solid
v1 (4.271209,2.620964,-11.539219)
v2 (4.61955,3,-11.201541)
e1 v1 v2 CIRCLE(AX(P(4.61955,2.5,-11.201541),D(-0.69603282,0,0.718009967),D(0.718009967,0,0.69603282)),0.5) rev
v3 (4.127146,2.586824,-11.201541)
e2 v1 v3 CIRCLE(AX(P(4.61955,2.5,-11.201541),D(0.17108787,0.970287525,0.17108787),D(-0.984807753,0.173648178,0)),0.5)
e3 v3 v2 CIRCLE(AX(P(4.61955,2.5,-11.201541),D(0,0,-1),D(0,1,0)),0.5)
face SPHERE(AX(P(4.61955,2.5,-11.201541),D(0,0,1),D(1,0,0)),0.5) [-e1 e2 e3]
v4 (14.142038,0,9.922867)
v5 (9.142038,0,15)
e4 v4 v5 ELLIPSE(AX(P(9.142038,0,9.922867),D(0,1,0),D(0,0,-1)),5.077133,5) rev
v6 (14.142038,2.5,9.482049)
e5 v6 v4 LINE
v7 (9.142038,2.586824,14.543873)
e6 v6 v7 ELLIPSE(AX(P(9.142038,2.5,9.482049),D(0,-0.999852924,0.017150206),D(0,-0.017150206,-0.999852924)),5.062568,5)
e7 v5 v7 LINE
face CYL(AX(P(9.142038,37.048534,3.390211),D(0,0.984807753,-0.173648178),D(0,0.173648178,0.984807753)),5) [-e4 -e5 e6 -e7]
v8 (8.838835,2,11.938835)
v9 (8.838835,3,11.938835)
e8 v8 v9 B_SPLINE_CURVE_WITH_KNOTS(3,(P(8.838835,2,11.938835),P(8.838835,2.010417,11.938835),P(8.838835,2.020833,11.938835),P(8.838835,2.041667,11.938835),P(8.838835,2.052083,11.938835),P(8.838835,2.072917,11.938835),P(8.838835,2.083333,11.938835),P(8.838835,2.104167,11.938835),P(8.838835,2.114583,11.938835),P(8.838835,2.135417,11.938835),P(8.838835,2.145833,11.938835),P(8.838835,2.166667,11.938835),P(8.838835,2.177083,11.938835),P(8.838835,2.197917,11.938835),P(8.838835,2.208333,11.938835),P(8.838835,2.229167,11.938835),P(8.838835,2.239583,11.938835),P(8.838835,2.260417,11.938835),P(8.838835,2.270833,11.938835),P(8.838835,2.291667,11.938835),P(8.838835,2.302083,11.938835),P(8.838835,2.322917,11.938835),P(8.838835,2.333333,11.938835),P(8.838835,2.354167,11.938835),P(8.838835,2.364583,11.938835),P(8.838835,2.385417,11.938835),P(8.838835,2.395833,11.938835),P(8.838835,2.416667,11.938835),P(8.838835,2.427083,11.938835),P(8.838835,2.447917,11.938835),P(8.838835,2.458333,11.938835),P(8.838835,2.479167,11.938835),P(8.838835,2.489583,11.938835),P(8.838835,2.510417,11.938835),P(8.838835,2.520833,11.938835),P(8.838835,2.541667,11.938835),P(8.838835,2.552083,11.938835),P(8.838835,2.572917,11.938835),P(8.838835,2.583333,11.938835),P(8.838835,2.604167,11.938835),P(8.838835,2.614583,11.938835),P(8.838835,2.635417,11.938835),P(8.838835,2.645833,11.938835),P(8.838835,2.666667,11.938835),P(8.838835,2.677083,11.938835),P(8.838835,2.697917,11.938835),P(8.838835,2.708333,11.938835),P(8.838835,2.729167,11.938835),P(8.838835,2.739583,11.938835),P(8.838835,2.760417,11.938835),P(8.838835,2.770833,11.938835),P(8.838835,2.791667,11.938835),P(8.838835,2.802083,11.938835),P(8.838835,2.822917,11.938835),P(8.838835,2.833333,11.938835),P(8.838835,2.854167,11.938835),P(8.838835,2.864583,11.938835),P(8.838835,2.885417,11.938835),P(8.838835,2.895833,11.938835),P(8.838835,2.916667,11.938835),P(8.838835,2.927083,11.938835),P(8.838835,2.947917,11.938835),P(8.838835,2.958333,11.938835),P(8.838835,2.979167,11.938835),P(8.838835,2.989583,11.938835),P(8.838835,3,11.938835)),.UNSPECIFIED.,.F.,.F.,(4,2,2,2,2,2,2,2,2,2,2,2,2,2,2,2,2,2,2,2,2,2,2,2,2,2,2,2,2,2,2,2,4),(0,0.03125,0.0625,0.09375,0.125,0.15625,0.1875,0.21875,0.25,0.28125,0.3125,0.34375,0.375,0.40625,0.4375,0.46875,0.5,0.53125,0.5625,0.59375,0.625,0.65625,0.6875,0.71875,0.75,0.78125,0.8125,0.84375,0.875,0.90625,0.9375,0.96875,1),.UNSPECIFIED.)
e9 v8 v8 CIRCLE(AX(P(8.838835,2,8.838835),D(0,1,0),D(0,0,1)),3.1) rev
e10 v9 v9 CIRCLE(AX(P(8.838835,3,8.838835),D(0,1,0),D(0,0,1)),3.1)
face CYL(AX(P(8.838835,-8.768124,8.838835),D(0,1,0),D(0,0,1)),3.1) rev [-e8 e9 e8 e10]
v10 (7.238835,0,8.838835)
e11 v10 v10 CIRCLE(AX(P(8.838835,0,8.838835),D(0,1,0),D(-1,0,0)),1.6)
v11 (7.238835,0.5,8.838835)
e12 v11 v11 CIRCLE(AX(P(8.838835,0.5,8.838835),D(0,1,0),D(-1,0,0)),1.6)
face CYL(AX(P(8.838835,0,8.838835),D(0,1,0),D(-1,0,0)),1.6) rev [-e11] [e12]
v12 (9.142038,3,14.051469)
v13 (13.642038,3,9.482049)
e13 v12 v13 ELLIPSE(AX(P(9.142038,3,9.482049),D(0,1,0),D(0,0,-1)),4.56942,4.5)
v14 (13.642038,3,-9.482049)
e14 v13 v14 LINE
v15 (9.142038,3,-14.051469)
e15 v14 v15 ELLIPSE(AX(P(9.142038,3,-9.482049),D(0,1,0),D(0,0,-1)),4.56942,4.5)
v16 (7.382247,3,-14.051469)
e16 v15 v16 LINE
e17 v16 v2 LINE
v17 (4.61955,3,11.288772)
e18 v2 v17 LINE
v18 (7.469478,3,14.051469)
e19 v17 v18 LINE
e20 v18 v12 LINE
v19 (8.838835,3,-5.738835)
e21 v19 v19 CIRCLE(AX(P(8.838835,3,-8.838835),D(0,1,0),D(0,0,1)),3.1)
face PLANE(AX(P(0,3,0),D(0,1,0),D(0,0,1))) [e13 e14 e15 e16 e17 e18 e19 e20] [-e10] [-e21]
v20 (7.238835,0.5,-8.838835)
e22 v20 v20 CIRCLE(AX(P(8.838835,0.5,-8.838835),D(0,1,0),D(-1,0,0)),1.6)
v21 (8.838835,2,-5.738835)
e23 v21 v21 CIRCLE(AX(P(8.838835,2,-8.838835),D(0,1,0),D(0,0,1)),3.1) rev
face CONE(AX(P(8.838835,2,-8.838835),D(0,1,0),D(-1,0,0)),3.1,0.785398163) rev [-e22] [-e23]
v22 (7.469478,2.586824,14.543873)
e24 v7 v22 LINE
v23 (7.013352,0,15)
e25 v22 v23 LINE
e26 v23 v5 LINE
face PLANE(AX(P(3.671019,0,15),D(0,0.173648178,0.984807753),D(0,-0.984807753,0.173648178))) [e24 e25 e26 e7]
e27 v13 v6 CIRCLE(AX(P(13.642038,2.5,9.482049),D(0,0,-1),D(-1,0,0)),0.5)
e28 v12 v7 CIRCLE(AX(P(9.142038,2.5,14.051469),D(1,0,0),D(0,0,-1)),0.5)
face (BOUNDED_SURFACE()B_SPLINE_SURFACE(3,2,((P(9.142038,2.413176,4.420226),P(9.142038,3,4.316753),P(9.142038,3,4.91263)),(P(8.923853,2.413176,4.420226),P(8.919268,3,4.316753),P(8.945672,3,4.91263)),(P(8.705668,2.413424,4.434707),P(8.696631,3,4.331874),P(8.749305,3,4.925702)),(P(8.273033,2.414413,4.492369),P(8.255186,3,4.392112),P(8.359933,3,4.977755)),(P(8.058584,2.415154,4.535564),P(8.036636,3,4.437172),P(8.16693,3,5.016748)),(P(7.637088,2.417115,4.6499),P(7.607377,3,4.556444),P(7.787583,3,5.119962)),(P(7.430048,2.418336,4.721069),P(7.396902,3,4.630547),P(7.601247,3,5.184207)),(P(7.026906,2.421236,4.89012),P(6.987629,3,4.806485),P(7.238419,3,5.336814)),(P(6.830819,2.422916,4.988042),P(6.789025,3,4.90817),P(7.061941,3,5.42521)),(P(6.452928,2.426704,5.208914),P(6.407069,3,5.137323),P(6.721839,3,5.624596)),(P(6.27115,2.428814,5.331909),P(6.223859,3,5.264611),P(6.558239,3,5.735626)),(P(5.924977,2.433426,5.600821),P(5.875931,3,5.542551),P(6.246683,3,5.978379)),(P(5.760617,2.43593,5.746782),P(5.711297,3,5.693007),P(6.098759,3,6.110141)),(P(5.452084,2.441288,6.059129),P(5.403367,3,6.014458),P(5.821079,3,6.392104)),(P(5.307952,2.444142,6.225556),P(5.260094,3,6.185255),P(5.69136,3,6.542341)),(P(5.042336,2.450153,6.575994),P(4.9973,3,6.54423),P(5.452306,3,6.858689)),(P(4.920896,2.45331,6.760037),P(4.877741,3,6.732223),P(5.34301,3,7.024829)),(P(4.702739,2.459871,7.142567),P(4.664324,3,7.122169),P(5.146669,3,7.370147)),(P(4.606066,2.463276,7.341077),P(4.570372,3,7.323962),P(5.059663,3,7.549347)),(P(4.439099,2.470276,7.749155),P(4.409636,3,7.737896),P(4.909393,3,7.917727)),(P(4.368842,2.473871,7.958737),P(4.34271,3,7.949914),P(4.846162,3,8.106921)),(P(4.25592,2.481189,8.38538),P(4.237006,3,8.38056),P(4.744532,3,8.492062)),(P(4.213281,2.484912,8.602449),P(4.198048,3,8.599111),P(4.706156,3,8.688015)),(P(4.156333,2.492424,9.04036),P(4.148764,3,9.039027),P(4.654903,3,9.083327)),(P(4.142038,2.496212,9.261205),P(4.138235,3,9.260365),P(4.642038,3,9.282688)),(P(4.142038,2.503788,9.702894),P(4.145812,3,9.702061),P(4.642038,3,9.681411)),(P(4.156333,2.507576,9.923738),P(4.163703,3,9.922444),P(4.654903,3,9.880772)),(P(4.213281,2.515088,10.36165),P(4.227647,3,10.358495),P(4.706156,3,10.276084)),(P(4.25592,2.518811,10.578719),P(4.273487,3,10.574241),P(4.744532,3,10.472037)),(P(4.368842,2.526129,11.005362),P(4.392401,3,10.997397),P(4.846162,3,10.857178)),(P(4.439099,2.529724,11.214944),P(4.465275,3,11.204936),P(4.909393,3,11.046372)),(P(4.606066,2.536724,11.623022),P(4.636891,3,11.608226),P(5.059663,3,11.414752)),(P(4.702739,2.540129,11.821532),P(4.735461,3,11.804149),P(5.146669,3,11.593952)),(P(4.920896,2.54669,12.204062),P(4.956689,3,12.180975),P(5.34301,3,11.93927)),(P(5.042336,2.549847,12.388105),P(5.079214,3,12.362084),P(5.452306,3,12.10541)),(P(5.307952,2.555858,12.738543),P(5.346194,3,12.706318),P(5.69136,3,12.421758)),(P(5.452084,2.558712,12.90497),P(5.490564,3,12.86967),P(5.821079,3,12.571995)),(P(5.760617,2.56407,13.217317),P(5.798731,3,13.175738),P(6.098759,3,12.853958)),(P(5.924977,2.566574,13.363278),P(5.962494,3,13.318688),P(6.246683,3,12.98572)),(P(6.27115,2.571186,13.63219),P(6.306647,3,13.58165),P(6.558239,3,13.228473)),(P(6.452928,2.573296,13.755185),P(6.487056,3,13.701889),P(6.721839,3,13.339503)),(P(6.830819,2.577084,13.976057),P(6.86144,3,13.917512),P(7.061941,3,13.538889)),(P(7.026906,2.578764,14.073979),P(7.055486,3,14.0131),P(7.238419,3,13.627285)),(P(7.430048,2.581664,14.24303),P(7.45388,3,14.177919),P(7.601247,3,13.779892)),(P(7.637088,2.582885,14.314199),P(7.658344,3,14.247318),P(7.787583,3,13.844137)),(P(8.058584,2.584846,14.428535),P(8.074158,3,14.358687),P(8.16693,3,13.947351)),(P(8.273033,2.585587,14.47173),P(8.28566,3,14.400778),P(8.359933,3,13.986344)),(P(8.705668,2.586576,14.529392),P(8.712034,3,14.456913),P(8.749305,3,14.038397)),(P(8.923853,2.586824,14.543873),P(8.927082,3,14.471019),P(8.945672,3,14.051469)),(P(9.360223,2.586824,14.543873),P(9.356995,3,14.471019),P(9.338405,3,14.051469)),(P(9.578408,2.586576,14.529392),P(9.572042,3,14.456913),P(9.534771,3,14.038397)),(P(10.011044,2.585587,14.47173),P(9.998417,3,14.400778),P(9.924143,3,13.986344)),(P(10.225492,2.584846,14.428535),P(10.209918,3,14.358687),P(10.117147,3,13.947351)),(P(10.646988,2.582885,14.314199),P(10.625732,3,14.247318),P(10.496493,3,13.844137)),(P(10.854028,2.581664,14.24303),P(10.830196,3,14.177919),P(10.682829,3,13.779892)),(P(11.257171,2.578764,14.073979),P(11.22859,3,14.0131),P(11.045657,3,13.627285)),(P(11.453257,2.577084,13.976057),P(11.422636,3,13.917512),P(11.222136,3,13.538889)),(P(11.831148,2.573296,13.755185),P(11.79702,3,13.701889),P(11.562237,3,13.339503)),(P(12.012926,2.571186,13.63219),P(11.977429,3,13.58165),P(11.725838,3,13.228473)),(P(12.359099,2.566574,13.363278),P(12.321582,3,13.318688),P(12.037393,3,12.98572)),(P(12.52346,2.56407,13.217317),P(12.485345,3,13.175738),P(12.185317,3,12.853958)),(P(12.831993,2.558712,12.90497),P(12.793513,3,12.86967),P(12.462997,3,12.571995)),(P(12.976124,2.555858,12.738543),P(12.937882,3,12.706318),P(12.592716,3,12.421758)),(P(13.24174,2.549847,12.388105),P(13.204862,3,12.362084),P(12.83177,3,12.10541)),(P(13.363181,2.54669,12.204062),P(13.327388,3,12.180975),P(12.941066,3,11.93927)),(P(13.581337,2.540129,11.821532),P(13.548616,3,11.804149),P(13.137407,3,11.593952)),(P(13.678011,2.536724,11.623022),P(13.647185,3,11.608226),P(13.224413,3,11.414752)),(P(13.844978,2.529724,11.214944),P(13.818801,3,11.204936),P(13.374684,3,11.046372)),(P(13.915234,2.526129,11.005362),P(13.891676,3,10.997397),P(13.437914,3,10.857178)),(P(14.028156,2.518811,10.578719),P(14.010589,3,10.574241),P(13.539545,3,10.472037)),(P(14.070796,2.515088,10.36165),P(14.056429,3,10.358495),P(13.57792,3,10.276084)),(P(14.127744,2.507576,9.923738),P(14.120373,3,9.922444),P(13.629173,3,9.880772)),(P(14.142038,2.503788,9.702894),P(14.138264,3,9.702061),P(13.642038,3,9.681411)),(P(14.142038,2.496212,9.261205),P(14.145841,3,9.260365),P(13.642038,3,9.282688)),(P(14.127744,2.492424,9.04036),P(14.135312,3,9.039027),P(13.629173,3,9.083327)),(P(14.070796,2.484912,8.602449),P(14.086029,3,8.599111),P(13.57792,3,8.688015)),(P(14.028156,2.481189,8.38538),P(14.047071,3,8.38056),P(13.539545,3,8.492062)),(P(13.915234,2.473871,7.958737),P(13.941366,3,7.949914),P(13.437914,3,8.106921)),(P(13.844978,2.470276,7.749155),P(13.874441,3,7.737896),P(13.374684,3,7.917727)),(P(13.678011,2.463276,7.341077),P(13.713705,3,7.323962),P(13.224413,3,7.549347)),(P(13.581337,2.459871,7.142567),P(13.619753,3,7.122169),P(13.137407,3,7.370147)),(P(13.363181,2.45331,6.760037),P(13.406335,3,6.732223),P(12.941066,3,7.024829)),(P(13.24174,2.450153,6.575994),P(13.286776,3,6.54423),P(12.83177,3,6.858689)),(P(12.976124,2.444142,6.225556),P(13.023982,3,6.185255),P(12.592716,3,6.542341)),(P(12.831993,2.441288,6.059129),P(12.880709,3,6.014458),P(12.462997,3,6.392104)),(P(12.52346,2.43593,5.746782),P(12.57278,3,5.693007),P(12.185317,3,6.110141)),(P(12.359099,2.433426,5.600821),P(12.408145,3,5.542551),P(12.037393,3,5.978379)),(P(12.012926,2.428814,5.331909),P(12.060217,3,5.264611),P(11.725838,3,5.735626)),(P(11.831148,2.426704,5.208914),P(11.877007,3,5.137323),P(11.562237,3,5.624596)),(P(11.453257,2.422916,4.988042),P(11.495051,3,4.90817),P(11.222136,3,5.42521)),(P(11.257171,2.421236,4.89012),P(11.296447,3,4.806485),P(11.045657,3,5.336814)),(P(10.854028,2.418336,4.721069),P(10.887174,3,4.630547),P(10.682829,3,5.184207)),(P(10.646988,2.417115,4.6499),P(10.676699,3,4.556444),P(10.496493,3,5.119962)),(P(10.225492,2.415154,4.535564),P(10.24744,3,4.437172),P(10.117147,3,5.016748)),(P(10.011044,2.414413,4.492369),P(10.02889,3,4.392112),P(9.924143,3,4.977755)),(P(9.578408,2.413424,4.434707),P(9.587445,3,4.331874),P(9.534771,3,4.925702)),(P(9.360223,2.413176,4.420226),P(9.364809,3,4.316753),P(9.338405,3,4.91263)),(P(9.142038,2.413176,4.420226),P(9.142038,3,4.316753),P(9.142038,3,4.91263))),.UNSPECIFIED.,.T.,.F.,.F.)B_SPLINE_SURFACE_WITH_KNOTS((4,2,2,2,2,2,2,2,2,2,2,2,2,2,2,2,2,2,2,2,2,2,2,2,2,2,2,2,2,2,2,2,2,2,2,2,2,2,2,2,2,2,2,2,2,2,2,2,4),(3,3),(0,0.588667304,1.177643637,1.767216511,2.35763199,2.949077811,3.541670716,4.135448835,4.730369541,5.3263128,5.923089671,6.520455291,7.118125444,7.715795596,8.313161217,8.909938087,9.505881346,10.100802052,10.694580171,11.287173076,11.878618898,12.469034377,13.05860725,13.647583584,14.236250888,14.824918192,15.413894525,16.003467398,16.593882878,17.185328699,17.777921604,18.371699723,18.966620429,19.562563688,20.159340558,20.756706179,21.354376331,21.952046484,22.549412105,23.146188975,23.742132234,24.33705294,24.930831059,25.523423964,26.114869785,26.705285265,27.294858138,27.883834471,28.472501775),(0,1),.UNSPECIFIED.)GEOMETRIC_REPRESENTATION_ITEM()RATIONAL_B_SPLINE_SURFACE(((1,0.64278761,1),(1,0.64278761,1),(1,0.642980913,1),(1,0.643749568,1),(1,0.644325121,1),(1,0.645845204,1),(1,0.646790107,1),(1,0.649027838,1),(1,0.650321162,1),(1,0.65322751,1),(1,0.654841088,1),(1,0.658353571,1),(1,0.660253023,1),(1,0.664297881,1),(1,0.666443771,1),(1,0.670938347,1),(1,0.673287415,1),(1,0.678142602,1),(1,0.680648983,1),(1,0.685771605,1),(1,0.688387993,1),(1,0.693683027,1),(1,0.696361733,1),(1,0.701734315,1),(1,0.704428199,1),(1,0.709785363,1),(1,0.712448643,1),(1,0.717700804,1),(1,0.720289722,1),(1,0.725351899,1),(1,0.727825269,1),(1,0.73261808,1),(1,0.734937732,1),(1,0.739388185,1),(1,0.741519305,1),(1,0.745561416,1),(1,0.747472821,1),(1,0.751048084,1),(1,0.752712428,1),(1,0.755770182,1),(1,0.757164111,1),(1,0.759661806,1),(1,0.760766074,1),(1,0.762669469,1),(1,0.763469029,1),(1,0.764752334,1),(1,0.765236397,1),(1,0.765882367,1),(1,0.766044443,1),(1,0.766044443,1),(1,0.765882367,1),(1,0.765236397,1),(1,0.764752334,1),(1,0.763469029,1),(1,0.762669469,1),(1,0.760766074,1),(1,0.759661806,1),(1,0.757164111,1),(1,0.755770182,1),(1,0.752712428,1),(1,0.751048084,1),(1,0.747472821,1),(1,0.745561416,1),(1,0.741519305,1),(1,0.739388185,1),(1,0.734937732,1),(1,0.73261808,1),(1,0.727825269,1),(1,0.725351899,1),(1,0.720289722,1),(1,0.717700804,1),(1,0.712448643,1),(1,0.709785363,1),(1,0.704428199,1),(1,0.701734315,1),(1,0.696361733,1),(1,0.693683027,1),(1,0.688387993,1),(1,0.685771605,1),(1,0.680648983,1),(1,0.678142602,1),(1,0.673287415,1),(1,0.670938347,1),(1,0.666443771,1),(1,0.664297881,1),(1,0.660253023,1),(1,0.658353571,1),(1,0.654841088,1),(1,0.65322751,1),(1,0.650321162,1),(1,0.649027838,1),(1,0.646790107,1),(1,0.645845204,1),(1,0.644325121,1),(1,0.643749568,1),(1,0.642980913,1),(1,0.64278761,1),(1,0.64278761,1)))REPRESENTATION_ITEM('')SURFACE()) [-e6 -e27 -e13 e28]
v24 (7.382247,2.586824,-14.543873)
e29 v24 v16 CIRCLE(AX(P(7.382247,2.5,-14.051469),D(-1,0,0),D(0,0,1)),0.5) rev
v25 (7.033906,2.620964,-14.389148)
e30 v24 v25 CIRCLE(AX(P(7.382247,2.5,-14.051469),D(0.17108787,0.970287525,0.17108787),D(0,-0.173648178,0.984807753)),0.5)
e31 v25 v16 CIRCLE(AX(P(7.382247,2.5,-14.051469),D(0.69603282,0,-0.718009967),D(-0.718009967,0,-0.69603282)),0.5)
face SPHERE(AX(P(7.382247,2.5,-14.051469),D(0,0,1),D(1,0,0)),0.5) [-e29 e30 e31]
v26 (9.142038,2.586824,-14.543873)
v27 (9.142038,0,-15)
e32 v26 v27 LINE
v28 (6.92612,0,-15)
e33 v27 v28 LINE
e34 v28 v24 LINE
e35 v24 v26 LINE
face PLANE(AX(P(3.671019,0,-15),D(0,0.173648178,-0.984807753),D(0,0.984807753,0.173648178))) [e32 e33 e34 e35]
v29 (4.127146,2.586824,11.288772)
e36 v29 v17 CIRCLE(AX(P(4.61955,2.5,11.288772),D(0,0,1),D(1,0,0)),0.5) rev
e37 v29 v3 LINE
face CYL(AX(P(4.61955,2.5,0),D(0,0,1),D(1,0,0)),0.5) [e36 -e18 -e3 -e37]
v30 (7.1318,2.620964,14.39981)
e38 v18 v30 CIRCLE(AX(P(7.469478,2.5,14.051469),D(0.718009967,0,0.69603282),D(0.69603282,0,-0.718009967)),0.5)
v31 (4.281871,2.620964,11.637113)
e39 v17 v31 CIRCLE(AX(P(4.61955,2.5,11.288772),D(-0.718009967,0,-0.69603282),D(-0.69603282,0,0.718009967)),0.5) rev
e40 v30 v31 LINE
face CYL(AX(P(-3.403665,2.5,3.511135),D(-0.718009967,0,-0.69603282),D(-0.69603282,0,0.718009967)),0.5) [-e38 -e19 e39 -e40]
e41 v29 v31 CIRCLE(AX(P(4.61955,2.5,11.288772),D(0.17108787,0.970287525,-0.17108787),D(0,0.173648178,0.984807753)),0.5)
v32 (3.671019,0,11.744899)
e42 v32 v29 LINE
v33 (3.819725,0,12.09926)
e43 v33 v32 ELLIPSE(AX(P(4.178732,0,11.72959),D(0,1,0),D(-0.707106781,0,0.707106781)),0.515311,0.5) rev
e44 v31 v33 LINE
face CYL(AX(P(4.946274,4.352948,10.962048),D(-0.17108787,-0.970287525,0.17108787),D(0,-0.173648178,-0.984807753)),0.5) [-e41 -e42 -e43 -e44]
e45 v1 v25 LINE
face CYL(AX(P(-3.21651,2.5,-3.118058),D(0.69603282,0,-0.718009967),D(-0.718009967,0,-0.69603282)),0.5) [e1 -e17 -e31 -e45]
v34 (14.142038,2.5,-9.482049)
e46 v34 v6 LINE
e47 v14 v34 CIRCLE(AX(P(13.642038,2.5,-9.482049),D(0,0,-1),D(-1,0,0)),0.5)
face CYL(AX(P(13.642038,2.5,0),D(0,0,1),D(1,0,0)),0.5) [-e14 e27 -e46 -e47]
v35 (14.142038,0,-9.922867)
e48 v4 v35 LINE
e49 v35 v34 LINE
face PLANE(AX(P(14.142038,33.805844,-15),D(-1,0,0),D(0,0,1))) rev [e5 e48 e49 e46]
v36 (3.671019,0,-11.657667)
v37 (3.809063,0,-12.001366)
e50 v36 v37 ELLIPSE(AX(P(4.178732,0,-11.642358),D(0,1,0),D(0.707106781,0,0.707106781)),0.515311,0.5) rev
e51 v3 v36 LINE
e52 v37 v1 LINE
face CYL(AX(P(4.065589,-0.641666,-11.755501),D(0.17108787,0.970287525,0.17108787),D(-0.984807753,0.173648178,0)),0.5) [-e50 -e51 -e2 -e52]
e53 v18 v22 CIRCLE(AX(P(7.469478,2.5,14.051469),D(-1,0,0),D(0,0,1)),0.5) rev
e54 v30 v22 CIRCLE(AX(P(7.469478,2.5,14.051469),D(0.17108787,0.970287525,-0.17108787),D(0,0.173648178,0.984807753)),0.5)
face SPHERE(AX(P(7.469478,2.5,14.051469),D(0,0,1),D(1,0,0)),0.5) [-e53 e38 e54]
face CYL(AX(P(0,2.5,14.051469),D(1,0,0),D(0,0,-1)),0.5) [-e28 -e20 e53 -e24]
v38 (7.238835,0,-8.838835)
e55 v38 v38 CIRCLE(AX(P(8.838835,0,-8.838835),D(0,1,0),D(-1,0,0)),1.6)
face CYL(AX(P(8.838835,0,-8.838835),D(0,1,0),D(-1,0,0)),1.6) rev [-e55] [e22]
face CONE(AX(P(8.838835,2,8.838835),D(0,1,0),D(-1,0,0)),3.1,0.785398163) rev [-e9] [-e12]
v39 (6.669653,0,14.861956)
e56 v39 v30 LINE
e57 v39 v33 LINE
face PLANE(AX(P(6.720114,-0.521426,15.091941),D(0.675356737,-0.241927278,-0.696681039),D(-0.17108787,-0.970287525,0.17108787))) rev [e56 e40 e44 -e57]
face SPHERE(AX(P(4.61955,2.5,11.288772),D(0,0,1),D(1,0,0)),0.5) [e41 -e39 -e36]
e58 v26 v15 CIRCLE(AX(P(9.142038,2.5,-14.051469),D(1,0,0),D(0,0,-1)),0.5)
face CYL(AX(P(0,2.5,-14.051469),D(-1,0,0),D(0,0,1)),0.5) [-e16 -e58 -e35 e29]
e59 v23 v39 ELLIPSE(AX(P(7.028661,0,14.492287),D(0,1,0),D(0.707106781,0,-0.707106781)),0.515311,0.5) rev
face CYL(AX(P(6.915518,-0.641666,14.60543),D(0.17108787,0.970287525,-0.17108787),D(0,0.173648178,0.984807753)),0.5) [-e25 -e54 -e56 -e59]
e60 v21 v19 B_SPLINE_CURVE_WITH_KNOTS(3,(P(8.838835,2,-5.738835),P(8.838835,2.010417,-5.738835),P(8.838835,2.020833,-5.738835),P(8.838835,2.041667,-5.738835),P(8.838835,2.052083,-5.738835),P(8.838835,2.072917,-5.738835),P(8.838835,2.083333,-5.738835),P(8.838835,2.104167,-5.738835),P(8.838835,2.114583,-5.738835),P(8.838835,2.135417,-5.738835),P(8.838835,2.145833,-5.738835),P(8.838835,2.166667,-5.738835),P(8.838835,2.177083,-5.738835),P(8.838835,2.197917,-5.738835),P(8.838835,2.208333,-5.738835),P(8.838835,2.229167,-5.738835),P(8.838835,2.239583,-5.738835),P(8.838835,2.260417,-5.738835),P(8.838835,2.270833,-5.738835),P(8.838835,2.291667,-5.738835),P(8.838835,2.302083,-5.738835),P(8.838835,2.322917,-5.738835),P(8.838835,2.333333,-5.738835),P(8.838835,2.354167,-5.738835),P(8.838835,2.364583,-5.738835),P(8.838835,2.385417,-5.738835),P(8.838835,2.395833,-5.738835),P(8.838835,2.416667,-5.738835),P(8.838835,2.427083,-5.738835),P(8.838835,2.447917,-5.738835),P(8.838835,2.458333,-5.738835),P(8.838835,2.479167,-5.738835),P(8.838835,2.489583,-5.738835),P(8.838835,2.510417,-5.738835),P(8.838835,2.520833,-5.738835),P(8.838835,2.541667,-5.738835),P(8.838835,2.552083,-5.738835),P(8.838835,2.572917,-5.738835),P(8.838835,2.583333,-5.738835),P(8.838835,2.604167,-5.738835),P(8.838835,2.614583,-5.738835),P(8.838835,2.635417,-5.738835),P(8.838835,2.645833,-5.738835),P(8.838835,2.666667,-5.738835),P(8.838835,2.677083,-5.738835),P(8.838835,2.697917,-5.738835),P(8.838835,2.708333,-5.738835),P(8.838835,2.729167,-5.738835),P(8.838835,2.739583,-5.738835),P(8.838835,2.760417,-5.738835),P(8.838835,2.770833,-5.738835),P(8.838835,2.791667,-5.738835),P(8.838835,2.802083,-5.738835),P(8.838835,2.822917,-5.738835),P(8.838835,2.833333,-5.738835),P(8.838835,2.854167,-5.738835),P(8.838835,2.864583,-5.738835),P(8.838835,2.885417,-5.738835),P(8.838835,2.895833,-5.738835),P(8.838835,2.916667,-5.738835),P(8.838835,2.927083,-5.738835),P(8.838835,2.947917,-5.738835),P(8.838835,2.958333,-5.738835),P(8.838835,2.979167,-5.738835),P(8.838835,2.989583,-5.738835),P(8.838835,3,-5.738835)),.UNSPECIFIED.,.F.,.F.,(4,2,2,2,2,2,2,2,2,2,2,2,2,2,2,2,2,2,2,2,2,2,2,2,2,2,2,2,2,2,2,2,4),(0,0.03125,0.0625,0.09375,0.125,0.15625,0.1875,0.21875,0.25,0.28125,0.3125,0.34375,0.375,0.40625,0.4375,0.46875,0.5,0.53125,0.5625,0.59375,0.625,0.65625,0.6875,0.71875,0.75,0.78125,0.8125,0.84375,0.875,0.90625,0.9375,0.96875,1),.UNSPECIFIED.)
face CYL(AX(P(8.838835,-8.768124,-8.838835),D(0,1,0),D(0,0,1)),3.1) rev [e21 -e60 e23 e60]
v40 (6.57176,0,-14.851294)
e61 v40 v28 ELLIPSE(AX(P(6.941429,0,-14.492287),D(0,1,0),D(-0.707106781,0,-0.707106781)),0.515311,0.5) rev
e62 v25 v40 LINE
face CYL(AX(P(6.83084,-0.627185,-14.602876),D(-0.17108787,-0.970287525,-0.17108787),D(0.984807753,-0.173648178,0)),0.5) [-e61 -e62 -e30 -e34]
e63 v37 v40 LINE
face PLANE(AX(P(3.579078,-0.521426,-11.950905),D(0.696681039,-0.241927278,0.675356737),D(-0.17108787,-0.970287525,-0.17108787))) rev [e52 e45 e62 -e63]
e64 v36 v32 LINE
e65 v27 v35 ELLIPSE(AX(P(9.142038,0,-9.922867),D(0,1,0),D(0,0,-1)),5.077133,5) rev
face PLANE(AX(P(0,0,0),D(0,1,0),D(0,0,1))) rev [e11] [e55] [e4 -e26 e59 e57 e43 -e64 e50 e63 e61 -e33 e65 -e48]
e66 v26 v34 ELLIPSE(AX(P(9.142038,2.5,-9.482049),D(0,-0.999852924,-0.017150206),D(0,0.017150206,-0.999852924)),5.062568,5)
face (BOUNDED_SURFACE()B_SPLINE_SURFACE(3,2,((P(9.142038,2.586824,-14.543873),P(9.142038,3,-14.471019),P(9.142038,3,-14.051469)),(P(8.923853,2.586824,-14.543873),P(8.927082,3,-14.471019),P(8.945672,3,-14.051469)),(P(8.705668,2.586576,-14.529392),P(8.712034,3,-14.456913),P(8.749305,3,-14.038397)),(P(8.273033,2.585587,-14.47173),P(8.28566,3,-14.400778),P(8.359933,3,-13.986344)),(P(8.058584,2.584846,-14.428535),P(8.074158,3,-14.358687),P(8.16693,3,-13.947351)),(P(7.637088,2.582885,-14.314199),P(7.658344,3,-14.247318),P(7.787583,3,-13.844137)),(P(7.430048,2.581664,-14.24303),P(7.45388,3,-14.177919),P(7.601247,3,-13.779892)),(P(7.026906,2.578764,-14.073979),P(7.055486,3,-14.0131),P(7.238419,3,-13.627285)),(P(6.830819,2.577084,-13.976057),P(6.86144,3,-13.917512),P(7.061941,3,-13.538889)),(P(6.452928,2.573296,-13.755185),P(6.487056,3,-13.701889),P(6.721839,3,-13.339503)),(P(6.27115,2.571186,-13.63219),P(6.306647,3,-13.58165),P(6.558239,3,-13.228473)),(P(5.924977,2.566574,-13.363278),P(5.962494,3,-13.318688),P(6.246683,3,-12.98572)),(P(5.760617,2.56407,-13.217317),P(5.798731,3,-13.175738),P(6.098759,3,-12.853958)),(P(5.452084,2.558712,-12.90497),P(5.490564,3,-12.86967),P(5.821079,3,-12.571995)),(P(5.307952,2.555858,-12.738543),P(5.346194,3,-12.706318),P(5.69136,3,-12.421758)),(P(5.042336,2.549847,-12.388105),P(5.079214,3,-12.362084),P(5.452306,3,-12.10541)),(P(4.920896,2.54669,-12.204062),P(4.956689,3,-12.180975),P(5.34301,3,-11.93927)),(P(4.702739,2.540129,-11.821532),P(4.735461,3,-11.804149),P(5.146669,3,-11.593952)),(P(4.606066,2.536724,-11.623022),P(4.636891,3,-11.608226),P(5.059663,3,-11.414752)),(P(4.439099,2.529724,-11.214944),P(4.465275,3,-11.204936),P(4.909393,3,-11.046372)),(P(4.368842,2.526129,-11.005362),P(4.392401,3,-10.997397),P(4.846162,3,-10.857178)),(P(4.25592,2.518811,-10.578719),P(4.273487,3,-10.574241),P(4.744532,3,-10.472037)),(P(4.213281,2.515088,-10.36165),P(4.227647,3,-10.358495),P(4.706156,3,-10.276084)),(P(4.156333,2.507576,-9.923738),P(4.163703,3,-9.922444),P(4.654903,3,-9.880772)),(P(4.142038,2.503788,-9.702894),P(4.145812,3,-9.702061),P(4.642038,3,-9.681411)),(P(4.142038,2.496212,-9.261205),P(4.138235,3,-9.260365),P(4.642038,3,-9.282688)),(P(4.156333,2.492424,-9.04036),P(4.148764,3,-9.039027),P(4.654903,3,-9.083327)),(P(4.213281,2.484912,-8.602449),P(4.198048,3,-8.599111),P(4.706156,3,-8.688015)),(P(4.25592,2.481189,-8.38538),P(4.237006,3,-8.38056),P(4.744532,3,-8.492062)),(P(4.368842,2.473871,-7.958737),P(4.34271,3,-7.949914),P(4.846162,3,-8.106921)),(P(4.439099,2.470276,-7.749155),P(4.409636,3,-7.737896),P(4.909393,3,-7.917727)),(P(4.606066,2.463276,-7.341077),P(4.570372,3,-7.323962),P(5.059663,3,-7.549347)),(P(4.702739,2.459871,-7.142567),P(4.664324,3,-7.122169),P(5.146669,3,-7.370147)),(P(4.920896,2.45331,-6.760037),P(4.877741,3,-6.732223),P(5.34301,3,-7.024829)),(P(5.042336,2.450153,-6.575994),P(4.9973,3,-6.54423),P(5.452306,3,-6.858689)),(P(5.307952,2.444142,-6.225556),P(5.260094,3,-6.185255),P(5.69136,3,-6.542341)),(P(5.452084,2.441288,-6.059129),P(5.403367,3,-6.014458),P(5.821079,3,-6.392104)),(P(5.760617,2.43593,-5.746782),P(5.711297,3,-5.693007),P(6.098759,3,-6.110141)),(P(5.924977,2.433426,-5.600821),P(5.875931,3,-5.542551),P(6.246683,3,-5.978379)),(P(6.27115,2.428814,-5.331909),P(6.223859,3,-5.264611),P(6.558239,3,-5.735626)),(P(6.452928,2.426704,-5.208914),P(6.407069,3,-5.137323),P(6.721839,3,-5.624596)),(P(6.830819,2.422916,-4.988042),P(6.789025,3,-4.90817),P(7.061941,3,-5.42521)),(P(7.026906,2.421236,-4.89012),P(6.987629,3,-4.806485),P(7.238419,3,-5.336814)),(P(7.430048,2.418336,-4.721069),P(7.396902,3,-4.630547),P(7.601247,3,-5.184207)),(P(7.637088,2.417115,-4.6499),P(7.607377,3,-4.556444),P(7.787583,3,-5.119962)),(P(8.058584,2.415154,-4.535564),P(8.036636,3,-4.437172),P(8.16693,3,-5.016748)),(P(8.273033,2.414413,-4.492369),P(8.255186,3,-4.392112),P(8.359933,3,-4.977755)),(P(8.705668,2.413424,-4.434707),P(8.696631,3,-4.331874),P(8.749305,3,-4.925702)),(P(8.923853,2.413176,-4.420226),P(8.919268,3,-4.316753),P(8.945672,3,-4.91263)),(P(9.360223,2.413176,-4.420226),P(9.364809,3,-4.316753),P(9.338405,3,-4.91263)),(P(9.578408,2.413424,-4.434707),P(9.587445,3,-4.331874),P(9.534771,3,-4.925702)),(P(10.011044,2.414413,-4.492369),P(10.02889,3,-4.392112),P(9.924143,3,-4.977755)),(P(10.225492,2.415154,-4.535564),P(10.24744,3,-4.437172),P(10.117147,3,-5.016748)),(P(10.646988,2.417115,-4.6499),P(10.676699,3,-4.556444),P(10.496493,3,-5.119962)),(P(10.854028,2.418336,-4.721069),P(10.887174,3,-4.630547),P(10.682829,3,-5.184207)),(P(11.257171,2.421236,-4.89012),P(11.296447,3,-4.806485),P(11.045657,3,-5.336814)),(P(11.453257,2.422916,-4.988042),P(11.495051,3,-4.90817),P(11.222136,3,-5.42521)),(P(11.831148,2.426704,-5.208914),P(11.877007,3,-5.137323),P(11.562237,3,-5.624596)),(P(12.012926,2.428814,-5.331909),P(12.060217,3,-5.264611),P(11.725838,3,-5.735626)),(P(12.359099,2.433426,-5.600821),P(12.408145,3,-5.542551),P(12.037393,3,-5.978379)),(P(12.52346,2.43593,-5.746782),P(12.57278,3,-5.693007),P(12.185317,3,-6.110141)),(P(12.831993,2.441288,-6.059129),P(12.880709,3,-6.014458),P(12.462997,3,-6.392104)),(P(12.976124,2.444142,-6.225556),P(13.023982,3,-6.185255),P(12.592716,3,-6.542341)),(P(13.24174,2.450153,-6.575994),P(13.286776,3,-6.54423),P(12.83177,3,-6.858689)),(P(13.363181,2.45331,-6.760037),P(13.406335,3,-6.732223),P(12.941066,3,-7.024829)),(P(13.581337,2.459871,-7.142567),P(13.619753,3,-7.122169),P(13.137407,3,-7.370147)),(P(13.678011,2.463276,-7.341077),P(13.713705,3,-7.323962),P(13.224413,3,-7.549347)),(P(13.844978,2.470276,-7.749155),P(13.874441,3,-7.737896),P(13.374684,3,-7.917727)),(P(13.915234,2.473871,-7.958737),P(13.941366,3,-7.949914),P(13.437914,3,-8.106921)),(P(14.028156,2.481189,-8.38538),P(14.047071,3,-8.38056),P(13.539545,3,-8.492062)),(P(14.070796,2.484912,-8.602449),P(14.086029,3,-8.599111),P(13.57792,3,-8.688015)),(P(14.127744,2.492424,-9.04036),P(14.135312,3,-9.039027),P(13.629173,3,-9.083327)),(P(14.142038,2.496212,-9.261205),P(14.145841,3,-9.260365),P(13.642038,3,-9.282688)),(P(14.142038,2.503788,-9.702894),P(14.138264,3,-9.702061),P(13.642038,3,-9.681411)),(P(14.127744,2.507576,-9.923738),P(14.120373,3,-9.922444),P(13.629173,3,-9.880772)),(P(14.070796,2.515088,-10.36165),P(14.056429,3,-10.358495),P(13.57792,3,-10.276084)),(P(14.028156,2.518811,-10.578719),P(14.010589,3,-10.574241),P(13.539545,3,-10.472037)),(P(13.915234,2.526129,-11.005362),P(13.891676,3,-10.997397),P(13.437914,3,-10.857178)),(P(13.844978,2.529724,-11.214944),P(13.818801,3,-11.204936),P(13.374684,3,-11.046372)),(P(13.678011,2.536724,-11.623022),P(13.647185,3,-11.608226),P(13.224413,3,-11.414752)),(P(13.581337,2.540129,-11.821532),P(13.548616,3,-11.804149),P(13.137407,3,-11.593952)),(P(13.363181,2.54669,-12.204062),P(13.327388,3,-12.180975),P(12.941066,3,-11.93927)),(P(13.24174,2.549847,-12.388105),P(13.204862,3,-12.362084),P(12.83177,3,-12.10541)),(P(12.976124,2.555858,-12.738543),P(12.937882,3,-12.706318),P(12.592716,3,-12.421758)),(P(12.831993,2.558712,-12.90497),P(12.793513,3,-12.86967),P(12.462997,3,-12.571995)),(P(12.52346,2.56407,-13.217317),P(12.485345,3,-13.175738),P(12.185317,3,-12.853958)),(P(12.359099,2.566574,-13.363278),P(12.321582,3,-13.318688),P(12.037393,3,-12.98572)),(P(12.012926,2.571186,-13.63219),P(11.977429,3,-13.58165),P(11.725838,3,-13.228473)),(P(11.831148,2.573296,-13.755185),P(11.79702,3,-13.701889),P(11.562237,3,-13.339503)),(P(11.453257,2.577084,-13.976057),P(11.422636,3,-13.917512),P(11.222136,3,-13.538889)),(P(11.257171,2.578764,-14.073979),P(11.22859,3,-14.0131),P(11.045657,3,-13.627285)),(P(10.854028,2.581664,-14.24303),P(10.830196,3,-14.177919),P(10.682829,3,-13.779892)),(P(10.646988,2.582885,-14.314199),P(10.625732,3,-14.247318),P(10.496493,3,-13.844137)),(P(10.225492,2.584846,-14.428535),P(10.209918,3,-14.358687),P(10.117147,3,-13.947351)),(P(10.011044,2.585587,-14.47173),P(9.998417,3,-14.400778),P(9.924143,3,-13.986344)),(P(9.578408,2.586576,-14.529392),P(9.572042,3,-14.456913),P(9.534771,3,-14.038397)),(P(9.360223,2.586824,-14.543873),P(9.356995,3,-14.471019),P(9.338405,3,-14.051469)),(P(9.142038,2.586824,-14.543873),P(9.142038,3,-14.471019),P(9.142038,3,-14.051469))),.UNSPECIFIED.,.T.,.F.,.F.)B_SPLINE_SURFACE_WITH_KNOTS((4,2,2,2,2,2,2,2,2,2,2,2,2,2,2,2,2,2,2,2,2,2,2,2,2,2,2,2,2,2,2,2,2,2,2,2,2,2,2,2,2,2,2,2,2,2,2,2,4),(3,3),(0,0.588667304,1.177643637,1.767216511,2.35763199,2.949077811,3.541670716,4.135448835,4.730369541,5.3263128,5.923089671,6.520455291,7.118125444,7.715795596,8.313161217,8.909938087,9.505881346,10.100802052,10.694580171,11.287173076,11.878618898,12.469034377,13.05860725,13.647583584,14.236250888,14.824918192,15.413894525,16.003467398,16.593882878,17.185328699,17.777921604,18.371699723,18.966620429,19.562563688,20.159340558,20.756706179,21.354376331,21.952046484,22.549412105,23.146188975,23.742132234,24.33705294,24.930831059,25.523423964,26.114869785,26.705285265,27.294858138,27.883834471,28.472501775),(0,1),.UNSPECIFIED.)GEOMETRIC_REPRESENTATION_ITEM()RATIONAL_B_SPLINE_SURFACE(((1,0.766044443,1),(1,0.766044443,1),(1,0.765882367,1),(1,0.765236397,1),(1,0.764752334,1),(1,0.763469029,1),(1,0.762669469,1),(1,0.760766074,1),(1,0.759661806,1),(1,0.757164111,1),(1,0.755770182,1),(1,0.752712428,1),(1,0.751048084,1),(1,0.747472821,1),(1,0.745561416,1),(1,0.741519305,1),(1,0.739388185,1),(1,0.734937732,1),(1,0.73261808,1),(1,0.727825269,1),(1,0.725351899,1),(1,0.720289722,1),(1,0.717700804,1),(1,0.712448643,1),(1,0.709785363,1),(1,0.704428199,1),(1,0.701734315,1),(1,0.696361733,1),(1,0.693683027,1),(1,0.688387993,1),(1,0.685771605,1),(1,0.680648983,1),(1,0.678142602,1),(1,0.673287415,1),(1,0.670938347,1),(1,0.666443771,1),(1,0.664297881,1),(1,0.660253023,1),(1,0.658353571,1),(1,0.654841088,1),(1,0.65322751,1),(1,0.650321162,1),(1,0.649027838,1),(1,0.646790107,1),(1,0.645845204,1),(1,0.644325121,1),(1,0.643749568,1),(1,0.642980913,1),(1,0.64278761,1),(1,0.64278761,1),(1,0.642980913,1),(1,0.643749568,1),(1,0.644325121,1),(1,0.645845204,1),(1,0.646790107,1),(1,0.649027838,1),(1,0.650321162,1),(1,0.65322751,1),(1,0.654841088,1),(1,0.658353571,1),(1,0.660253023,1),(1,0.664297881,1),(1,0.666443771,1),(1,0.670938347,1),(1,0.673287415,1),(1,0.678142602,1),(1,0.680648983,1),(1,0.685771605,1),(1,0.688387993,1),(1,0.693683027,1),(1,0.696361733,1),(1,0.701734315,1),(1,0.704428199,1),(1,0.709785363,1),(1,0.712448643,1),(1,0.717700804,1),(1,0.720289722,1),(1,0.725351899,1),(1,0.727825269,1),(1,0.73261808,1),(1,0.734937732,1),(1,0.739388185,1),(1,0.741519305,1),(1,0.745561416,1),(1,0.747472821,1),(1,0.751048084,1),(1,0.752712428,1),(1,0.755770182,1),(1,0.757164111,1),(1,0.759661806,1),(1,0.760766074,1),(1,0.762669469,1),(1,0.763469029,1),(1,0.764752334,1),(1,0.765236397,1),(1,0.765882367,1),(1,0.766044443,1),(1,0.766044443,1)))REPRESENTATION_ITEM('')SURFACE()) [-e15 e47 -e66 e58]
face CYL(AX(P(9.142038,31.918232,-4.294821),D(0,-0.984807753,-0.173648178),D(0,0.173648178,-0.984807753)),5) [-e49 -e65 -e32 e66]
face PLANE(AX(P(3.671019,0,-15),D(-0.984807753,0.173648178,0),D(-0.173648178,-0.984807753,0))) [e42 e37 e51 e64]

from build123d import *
from OCP.BRepFilletAPI import BRepFilletAPI_MakeChamfer

# Parameters (mm, degrees)
EXTRUDE_1_DEPTH     = 3
EXTRUDE_1_TAPER     = 10.000000000000021
EXTRUDE_3_DEPTH     = 3
CUT_EXTRUDE_3_DEPTH = 17.82260394825962
SKETCH_6_R          = 1.6
CUT_EXTRUDE_2_DEPTH = 21.832600617678803
SKETCH_9_R          = 3.1000000000000005
CUT_EXTRUDE_4_DEPTH = 1
CHAMFER_1_SIZE      = 1.5
FILLET_2_R          = 5
CHAMFER_2_SIZE      = 3
CHAMFER_2_SIZE2     = 3.094724616911856
CHAMFER_2_SIZE2_2   = 3.0947246169118565
FILLET_1_R          = 0.5


with BuildPart() as part:
    # Эскиз1 → Бобышка-Вытянуть1 (new body)
    with BuildSketch(Plane(origin=(0, 0, 0), x_dir=(1, 0, 0), z_dir=(0, 1, 0))):
        Polygon((3.6710190578746005, 14.999999999999998), (3.6710190578746094, -15.000000000000004), (7.67101905787461, -15.000000000000002), (7.6710190578746005, 14.999999999999998), align=None)
    extrude(amount=EXTRUDE_1_DEPTH, taper=EXTRUDE_1_TAPER)


with BuildPart() as body_2:
    # Эскиз2 → Бобышка-Вытянуть3 (new body)
    with BuildSketch(Plane(origin=(0, 0, 0), x_dir=(1, 0, 0), z_dir=(0, 1, 0))):
        Polygon((7.142038115749204, 14.471019057874603), (7.142038115749204, 14.999999999999998), (14.142038115749205, 14.999999999999996), (14.142038115749209, -15.000000000000004), (7.142038115749207, -15.000000000000004), (7.142038115749214, -14.471019057874607), align=None)
    extrude(amount=EXTRUDE_3_DEPTH)

    # Эскиз8 → Вырез-Вытянуть3 (cut, through all)
    with BuildSketch(Plane.ZY.offset(-7.142038115749204)):
        Polygon((-14.999999999999998, 2.999999999999999), (-14.999999999999998, 0), (-14.471019057874603, 3), align=None)
        Polygon((14.471019057874607, 3), (15.000000000000004, 0), (15, 2.999999999999999), align=None)
    extrude(amount=-CUT_EXTRUDE_3_DEPTH, mode=Mode.SUBTRACT)


with BuildPart() as part_1:
    add(part.part)

    # Combine 1: union body 2
    add(body_2.part)

    # Эскиз6 → Вырез-Вытянуть2 (cut, through all)
    with BuildSketch(Plane(origin=(0, 3, 0), x_dir=(1, 1.64e-15, 0), z_dir=(-1.64e-15, 1, 0))):
        with Locations(Location((8.838834764831857, 8.83883476483183, 0), (0, 0, 180))):
            Circle(SKETCH_6_R)
        with Locations(Location((8.838834764831846, -8.83883476483184, 0), (0, 0, 180))):
            Circle(SKETCH_6_R)
    extrude(amount=-CUT_EXTRUDE_2_DEPTH, mode=Mode.SUBTRACT)

    # Эскиз9 → Вырез-Вытянуть4 (cut)
    with BuildSketch(Plane(origin=(0, 3, 0), x_dir=(1, 0, 0), z_dir=(0, 1, 0))):
        with Locations(Location((8.838834764831857, 8.83883476483183, 0), (0, 0, 270))):
            Circle(SKETCH_9_R)
        with Locations(Location((8.838834764831846, -8.83883476483184, 0), (0, 0, 270))):
            Circle(SKETCH_9_R)
    extrude(amount=-CUT_EXTRUDE_4_DEPTH, mode=Mode.SUBTRACT)

    # Фаска1
    chamfer_1_edges = [part_1.edges().sort_by_distance(p)[0] for p in [
        (10.438834764831858, 2.0000000000000027, -8.83883476483183),
        (10.438834764831848, 2.0000000000000027, 8.83883476483184),
    ]]
    chamfer(chamfer_1_edges, length=CHAMFER_1_SIZE - 0.0001)  # a hair under: the kernel refuses the full size

    # Скругление2
    fillet_2_edges = [part_1.edges().sort_by_distance(p)[0] for p in [
        (14.142038115749205, 1.5000000000000049, -14.7355095289373),
        (14.142038115749209, 1.5, 14.735509528937309),
    ]]
    fillet(fillet_2_edges, radius=FILLET_2_R)

    # Фаска2: one chamfer whose edges measure the first distance from different faces: ONE call of the kernel's chamfer builder (chamfer() names one face for all edges)
    chamfer_2_edges_1 = [part_1.edges().sort_by_distance(p)[0] for p in [
        (3.9355095289373074, 1.5, 14.735509528937303),
    ]]
    chamfer_2_side_1 = [part_1.faces().sort_by_distance(p)[0] for p in [
        (3.9339270656333682, 1.4910254046341833, 4.6e-16),
    ]]
    chamfer_2_edges_2 = [part_1.edges().sort_by_distance(p)[0] for p in [
        (3.9355095289372986, 1.5, -14.7355095289373),
    ]]
    chamfer_2_side_2 = [part_1.faces().sort_by_distance(p)[0] for p in [
        (6.536534479688592, 1.4746001134294486, -14.739988214246614),
    ]]
    chamfer_2 = BRepFilletAPI_MakeChamfer(part_1.part.solid().wrapped)
    for e in chamfer_2_edges_1:
        chamfer_2.Add(CHAMFER_2_SIZE, CHAMFER_2_SIZE2, e.wrapped, chamfer_2_side_1[0].wrapped)  # the first distance lies on this face
    for e in chamfer_2_edges_2:
        chamfer_2.Add(CHAMFER_2_SIZE, CHAMFER_2_SIZE2_2, e.wrapped, chamfer_2_side_2[0].wrapped)  # the first distance lies on this face
    add(Compound.cast(chamfer_2.Shape()), mode=Mode.REPLACE)

    # Скругление1
    fillet_1_edges = [part_1.edges().sort_by_distance(p)[0] for p in [
        (14.142038115749207, 3, 1.78e-15),
        (8.193466364554162, 3, -14.471019057874603),
        (12.691076133990677, 3, -12.970196202352879),
        (12.691076133990677, 3, 12.970196202352883),
        (4.200000000000001, 3, 0.0480710792979236),
        (3.935509528937306, 1.4999999999999996, 11.690614915578193),
        (3.9355095289372994, 1.5, -11.594472756982334),
        (6.980404142296417, 1.4999999999999982, -14.735509528937293),
        (8.241537443852085, 3, 14.471019057874605),
        (5.77051838597748, 3, 12.948571751195045),
        (5.722447306679558, 3, -12.900500671897117),
        (7.076546300892258, 1.4999999999999976, 14.735509528937294),
    ]]
    fillet(fillet_1_edges, radius=FILLET_1_R)


solid = part_1.part
